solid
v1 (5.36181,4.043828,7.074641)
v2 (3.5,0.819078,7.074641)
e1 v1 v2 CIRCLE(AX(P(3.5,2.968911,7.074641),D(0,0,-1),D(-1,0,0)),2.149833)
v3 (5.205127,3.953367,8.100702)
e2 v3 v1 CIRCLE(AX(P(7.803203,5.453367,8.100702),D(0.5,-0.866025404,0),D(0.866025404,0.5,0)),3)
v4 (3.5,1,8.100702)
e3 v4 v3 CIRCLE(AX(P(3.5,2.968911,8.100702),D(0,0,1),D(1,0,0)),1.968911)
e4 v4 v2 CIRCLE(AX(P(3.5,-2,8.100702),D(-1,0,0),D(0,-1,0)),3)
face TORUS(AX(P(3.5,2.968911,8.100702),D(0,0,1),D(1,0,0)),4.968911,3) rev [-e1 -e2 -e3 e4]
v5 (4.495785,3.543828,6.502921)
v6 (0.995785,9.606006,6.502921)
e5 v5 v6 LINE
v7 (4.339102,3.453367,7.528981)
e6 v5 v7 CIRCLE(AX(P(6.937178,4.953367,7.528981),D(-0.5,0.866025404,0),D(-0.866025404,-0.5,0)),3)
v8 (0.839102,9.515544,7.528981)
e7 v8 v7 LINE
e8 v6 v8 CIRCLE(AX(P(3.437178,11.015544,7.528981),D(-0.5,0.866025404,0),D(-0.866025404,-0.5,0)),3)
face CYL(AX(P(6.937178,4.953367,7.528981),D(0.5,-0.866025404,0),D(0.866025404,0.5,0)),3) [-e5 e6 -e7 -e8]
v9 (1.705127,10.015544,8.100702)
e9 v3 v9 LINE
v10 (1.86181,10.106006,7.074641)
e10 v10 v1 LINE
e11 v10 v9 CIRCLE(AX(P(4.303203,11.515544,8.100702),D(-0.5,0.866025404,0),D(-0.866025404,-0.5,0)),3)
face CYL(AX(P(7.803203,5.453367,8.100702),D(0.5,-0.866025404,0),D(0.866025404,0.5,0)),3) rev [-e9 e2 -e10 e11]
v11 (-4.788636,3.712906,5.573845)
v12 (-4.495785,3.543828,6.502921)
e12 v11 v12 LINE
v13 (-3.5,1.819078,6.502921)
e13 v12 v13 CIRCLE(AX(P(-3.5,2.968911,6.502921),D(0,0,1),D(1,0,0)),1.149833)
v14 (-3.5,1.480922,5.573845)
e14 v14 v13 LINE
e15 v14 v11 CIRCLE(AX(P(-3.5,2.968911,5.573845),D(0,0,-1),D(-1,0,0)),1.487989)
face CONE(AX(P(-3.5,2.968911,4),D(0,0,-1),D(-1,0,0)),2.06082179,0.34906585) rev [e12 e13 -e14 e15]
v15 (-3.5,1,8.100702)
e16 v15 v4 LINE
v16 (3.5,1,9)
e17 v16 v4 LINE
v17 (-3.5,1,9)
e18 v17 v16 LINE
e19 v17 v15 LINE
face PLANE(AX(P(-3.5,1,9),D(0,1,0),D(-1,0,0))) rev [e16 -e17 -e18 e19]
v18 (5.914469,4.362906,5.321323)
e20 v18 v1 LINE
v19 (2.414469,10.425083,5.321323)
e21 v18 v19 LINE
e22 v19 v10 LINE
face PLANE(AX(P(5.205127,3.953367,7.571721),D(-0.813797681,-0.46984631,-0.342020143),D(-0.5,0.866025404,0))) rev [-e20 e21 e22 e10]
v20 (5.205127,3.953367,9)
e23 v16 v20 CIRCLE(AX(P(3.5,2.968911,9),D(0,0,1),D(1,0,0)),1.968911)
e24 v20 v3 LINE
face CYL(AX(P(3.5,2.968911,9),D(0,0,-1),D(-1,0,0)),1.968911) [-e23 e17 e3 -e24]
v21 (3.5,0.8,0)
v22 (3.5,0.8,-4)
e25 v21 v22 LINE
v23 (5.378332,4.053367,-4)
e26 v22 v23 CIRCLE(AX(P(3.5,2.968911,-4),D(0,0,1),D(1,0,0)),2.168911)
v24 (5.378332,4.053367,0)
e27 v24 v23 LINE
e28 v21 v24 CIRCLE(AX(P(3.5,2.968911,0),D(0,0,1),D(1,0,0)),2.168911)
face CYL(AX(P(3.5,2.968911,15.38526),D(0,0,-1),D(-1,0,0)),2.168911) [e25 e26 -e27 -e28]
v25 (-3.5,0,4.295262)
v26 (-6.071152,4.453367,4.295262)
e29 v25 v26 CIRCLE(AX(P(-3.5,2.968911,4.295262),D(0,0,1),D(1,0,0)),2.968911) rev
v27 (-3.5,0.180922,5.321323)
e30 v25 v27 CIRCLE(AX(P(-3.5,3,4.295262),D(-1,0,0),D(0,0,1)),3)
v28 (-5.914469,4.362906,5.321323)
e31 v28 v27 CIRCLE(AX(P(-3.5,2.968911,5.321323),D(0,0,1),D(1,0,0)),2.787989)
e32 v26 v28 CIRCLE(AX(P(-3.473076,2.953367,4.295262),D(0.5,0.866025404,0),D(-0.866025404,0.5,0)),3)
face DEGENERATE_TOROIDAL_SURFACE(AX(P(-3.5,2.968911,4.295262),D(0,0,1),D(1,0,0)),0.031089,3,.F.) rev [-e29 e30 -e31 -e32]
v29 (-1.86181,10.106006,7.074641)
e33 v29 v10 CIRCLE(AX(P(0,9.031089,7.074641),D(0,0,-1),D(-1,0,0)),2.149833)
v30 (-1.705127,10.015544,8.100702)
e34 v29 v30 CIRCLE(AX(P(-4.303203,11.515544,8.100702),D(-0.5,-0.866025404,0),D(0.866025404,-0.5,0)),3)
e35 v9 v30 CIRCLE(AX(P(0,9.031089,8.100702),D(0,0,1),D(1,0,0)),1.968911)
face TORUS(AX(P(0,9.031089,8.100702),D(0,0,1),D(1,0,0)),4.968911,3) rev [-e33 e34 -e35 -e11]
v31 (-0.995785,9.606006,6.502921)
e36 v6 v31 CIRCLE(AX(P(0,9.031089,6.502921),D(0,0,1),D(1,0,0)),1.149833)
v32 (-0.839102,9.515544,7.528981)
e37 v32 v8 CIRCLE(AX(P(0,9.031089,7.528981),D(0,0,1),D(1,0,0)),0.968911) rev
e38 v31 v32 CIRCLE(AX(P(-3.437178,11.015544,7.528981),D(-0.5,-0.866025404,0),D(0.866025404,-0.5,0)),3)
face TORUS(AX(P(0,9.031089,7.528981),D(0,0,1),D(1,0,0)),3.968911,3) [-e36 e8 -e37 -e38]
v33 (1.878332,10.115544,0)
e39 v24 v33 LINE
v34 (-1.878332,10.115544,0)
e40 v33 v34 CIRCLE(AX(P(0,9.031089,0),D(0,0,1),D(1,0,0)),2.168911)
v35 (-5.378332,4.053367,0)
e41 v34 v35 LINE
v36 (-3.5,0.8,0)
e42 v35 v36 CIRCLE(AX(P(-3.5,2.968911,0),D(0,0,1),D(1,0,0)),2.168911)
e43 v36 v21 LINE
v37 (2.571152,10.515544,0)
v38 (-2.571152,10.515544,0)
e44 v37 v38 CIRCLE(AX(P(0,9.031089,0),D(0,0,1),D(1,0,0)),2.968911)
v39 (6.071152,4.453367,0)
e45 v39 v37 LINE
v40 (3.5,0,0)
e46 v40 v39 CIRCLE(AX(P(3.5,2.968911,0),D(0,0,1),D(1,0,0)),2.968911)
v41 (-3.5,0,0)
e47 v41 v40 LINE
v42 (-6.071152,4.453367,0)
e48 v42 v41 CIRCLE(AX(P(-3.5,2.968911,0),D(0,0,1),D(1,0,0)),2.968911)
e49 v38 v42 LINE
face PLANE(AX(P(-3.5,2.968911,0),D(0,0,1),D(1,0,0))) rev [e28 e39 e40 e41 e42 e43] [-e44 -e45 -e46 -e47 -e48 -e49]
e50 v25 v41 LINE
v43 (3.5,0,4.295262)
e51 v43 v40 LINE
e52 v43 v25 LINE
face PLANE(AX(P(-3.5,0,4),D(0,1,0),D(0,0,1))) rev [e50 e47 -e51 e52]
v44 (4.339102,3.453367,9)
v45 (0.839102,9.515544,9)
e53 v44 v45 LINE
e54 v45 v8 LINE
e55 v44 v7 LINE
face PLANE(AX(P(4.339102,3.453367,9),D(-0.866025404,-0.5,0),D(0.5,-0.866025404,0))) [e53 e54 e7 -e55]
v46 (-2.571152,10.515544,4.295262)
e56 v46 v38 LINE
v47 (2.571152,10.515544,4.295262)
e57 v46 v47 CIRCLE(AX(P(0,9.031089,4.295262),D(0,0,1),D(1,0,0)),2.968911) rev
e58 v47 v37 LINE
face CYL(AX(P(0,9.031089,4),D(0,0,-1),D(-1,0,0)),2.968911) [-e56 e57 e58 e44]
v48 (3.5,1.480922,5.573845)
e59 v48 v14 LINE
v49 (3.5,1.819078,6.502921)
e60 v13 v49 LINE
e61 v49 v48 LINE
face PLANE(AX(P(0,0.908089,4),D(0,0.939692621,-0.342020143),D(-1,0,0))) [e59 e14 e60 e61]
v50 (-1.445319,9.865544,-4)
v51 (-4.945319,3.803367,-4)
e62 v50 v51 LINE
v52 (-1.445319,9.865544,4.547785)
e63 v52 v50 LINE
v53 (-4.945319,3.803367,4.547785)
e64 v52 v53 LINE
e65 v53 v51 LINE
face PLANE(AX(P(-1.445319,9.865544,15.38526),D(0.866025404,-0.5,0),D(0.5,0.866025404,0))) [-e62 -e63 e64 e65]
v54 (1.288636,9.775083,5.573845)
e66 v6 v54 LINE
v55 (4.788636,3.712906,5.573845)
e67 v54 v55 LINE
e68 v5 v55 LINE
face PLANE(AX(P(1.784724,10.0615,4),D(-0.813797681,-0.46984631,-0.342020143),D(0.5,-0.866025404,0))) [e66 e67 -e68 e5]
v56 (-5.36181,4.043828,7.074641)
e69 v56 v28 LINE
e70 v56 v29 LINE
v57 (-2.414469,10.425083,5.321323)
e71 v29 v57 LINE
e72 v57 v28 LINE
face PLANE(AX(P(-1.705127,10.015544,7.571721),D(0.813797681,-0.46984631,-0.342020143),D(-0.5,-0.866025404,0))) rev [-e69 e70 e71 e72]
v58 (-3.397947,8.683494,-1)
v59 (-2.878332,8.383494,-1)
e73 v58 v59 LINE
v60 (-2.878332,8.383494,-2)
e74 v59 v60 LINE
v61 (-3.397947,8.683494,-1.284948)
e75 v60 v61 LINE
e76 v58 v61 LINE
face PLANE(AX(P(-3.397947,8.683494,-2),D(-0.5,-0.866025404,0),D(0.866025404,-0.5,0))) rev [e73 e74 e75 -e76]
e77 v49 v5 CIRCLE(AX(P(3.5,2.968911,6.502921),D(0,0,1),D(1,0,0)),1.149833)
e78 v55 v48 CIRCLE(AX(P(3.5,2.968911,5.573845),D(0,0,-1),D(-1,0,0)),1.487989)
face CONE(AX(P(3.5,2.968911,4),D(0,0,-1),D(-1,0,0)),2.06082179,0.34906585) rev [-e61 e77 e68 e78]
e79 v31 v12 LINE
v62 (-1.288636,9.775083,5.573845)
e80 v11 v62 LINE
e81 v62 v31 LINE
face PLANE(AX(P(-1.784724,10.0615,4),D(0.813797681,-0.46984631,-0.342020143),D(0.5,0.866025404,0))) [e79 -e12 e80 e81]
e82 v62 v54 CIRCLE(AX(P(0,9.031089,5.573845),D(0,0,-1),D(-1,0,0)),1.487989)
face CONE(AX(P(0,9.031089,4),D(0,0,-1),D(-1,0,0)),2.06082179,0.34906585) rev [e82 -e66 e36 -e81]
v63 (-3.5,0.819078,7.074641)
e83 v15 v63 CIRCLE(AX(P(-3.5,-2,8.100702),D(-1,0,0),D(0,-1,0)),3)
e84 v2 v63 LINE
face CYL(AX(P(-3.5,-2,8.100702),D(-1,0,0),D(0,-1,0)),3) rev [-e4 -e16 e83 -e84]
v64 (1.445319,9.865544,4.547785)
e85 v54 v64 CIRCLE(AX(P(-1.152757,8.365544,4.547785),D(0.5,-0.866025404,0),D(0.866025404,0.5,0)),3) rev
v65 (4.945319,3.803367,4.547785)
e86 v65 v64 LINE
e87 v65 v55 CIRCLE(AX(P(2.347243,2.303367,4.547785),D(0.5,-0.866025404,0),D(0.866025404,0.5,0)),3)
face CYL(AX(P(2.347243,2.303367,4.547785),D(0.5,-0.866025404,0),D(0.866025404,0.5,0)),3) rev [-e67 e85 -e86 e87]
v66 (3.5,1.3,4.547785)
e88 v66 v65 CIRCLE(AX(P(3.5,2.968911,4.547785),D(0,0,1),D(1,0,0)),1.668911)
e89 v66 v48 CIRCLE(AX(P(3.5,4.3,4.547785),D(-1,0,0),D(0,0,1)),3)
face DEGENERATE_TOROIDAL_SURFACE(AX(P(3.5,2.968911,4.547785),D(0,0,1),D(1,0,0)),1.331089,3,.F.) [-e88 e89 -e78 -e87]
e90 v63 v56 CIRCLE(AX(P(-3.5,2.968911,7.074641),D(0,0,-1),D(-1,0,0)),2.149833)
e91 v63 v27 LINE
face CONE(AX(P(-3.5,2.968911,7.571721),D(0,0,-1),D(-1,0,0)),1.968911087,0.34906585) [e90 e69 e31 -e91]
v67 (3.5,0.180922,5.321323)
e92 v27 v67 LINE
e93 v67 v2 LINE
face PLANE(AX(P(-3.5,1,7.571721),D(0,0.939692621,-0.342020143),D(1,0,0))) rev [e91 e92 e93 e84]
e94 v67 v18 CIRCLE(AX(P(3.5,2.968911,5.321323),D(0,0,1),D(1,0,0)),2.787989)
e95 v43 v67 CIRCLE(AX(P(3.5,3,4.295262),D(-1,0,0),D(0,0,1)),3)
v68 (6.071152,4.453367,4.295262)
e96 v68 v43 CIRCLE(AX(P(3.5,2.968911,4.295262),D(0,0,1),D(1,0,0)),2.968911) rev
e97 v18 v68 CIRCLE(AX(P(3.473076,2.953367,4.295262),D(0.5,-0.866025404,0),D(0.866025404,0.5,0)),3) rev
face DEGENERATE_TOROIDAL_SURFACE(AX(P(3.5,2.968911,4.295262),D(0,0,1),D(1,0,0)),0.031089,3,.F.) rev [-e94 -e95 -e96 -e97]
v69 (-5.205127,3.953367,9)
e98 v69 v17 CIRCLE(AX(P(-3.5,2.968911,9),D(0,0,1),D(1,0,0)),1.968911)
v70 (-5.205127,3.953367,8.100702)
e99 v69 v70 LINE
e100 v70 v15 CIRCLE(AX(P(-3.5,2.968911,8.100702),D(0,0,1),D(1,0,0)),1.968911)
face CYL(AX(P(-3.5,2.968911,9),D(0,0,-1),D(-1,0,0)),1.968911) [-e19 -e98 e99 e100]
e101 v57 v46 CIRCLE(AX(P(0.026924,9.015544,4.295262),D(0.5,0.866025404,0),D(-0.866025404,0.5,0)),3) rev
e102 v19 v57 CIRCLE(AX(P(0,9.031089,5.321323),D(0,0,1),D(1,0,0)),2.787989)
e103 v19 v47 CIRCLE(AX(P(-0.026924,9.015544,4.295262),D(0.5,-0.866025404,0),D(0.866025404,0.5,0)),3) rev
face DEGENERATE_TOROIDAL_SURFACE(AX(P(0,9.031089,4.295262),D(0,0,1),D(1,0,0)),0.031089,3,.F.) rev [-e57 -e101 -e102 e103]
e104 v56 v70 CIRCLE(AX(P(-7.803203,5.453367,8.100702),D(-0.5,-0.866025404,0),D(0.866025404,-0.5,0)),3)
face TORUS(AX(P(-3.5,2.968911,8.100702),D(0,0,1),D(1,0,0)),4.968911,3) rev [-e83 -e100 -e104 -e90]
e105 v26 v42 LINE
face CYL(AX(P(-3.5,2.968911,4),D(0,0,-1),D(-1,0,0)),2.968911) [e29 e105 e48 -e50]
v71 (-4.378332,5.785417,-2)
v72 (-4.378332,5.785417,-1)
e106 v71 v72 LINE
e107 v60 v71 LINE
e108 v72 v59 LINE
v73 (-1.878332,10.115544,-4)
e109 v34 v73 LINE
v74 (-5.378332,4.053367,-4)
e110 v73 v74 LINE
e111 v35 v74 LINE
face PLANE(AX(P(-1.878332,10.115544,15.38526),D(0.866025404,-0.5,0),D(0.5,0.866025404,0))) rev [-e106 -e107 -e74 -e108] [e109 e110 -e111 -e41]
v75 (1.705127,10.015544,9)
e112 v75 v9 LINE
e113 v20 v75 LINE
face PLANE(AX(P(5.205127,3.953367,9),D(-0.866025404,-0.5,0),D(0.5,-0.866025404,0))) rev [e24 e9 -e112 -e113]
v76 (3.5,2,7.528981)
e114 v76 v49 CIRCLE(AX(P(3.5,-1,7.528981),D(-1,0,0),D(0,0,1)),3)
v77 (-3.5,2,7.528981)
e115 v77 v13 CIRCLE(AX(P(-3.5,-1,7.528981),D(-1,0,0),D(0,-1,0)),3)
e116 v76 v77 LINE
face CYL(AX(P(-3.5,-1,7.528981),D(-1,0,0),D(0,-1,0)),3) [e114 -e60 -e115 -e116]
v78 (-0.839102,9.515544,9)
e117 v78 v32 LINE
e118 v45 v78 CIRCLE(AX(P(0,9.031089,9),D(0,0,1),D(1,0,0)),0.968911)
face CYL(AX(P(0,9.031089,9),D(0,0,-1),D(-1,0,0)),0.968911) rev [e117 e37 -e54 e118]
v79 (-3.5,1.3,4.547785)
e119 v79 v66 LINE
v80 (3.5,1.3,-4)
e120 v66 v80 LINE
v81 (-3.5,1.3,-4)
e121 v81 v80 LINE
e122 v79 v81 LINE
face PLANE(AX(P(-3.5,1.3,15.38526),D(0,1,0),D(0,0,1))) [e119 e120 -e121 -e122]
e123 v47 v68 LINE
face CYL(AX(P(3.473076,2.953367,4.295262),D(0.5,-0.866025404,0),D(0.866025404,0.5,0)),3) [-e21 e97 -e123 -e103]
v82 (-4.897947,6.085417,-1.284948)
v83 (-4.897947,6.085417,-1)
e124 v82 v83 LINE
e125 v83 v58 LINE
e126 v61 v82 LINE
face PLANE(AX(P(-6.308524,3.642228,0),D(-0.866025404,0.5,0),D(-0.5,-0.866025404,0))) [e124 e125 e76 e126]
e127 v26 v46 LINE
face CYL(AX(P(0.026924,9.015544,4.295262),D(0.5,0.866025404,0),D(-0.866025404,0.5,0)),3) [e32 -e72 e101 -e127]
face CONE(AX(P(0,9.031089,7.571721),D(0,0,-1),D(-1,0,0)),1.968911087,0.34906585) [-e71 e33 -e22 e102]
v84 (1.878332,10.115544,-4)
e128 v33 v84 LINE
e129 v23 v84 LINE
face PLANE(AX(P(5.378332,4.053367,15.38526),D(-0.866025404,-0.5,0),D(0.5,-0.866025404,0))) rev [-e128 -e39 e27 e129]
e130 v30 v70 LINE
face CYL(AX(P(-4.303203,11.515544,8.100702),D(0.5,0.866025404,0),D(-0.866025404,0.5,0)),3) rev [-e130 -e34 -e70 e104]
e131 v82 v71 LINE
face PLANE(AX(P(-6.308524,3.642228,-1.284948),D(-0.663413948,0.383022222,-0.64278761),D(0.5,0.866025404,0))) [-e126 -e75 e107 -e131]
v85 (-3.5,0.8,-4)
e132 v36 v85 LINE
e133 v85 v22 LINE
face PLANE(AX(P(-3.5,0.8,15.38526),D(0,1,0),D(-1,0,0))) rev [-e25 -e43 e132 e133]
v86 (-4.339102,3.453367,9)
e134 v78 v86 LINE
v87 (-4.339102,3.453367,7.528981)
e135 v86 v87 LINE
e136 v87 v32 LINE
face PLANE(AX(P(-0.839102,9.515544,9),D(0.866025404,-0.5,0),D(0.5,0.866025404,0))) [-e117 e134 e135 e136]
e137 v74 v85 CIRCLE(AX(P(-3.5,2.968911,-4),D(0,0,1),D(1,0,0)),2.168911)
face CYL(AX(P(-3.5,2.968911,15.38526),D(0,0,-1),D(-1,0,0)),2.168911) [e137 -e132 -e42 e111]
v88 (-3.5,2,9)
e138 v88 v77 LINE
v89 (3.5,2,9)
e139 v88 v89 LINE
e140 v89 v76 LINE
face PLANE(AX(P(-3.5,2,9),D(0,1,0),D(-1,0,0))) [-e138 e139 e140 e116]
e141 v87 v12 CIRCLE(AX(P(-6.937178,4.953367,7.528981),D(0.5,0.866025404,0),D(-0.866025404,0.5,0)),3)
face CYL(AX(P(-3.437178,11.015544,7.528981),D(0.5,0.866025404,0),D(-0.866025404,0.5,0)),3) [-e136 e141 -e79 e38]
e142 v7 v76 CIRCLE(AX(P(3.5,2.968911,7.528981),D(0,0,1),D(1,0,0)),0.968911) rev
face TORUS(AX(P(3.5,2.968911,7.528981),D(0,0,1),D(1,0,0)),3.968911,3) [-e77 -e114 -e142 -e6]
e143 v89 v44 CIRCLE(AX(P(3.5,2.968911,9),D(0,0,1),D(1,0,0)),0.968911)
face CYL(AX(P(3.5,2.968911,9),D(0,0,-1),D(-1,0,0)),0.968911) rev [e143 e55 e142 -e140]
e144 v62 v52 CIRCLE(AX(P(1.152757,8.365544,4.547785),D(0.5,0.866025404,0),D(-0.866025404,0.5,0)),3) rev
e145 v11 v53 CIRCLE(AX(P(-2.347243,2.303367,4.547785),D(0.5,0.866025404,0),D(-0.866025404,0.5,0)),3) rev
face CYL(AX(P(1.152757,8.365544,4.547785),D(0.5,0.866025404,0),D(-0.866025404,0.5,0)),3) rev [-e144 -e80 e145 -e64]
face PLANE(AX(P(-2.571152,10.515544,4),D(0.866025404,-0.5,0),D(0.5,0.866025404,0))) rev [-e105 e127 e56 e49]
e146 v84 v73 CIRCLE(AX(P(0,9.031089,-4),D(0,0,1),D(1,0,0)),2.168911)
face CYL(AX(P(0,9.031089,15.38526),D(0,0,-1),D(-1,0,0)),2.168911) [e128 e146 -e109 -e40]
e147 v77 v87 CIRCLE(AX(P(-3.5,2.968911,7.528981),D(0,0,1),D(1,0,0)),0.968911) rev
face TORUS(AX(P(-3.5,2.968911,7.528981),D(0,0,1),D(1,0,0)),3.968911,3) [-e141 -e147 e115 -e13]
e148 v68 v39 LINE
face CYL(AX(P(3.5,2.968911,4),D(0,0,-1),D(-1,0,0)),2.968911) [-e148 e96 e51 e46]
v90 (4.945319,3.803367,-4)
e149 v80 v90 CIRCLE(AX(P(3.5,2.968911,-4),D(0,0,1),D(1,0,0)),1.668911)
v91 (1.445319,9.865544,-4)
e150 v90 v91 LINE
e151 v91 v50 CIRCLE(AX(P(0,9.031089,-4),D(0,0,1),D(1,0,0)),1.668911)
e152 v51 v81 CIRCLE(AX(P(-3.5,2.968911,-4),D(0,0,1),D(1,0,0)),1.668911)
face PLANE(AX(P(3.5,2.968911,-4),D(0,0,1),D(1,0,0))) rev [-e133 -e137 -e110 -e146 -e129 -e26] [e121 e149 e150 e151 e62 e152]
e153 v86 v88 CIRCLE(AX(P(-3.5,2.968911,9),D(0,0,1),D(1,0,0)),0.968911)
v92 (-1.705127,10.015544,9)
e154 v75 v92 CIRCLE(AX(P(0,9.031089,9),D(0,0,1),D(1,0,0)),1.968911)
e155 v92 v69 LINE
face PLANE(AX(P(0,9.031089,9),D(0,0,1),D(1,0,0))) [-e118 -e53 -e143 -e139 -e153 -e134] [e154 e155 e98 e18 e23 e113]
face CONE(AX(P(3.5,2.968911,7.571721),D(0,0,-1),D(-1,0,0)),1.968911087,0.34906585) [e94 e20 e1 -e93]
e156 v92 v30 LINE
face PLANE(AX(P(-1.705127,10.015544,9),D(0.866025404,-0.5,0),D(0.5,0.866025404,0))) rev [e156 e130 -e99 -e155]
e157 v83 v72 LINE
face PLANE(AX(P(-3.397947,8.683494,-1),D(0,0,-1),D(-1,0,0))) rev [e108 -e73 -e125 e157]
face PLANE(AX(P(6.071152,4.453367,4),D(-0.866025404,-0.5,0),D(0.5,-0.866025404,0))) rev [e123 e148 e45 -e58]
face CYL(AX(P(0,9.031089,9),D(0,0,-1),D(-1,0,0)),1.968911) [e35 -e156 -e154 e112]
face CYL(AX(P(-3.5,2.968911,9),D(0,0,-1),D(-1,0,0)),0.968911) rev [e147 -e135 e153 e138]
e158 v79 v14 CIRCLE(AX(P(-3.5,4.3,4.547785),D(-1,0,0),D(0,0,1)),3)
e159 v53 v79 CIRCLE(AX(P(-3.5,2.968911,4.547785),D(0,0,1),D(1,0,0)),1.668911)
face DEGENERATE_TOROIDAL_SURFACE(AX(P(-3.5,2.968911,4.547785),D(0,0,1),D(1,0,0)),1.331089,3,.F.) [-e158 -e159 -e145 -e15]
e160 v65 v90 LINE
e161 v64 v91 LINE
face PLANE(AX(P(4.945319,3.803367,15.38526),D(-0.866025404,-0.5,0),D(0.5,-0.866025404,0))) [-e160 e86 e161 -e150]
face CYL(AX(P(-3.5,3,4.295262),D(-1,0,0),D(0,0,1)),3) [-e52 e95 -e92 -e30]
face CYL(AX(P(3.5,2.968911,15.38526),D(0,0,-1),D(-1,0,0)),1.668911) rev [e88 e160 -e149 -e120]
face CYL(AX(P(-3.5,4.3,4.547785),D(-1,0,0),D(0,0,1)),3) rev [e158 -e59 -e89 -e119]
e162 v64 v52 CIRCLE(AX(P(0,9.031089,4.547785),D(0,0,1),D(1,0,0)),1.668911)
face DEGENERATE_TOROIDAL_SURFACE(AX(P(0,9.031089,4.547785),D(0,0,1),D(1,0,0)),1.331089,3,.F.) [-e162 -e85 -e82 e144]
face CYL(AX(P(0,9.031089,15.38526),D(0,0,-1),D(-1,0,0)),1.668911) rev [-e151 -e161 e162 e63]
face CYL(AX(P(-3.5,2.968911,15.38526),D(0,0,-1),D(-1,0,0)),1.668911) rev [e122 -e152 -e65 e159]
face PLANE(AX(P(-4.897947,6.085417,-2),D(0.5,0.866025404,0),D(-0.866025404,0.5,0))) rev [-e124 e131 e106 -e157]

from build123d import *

# Parameters (mm, degrees)
EXTRUDE_1_DEPTH  = 4
EXTRUDE_2_DEPTH  = 4
EXTRUDE_3_DEPTH  = 5
CHAMFER_1_SIZE   = 1.3
CHAMFER_1_SIZE_2 = 3.571720645
CHAMFER_2_SIZE   = 3
CHAMFER_2_SIZE_2 = 1.091910703
FILLET_1_R       = 3
SKETCH_5_W       = 1
SKETCH_5_H       = 3
EXTRUDE_4_DEPTH  = 0.6
CHAMFER_3_SIZE2  = 0.715052156
CHAMFER_3_SIZE   = 0.6


# Some blends are built 0.0001 mm under size
with BuildPart() as part:
    # Эскиз2 → Бобышка-Вытянуть1 (new body)
    with BuildSketch(Plane.XY.offset(-4)):
        with BuildLine():
            Line((5.3783321, 4.05336663), (1.8783321, 10.115544457))
            ThreePointArc((1.8783321, 10.115544457), (0, 11.2), (-1.8783321, 10.115544457))
            Line((-1.8783321, 10.115544457), (-5.3783321, 4.05336663))
            ThreePointArc((-5.3783321, 4.05336663), (-5.3783321, 1.884455543), (-3.5, 0.8))
            Line((-3.5, 0.8), (3.5, 0.8))
            ThreePointArc((3.5, 0.8), (5.3783321, 1.884455543), (5.3783321, 4.05336663))
        make_face()
        with BuildLine():
            Line((-1.445319398, 9.865544457), (-4.945319398, 3.80336663))
            ThreePointArc((-4.945319398, 3.80336663), (-4.945319398, 2.134455543), (-3.5, 1.3))
            Line((-3.5, 1.3), (3.5, 1.3))
            ThreePointArc((3.5, 1.3), (4.945319398, 2.134455543), (4.945319398, 3.80336663))
            Line((4.945319398, 3.80336663), (1.445319398, 9.865544457))
            ThreePointArc((1.445319398, 9.865544457), (0, 10.7), (-1.445319398, 9.865544457))
        make_face(mode=Mode.SUBTRACT)
    extrude(amount=EXTRUDE_1_DEPTH)

    # Эскиз3 → Бобышка-Вытянуть2 (add)
    with BuildSketch(Plane.XY):
        with BuildLine():
            Line((-3.5, 0), (3.5, 0))
            ThreePointArc((3.5, 0), (6.071152423, 1.484455543), (6.071152423, 4.45336663))
            Line((6.071152423, 4.45336663), (2.571152423, 10.515544457))
            ThreePointArc((2.571152423, 10.515544457), (0, 12), (-2.571152423, 10.515544457))
            Line((-2.571152423, 10.515544457), (-6.071152423, 4.45336663))
            ThreePointArc((-6.071152423, 4.45336663), (-6.071152423, 1.484455543), (-3.5, 0))
        make_face()
        with BuildLine():
            Line((4.945319398, 3.80336663), (1.445319398, 9.865544457))
            ThreePointArc((1.445319398, 9.865544457), (0, 10.7), (-1.445319398, 9.865544457))
            Line((-1.445319398, 9.865544457), (-4.945319398, 3.80336663))
            ThreePointArc((-4.945319398, 3.80336663), (-4.945319398, 2.134455543), (-3.5, 1.3))
            Line((-3.5, 1.3), (3.5, 1.3))
            ThreePointArc((3.5, 1.3), (4.945319398, 2.134455543), (4.945319398, 3.80336663))
        make_face(mode=Mode.SUBTRACT)
    extrude(amount=EXTRUDE_2_DEPTH)

    # Эскиз4 → Бобышка-Вытянуть3 (add)
    with BuildSketch(Plane.XY.offset(4)):
        with BuildLine():
            Line((-1.705127019, 10.015544457), (-5.205127019, 3.95336663))
            ThreePointArc((-5.205127019, 3.95336663), (-5.205127019, 1.984455543), (-3.5, 1))
            Line((-3.5, 1), (3.5, 1))
            ThreePointArc((3.5, 1), (5.205127019, 1.984455543), (5.205127019, 3.95336663))
            Line((5.205127019, 3.95336663), (1.705127019, 10.015544457))
            ThreePointArc((1.705127019, 10.015544457), (0, 11), (-1.705127019, 10.015544457))
        make_face()
        with BuildLine():
            Line((-3.5, 2), (3.5, 2))
            ThreePointArc((3.5, 2), (4.339101615, 2.484455543), (4.339101615, 3.45336663))
            Line((4.339101615, 3.45336663), (0.839101615, 9.515544457))
            ThreePointArc((0.839101615, 9.515544457), (0, 10), (-0.839101615, 9.515544457))
            Line((-0.839101615, 9.515544457), (-4.339101615, 3.45336663))
            ThreePointArc((-4.339101615, 3.45336663), (-4.339101615, 2.484455543), (-3.5, 2))
        make_face(mode=Mode.SUBTRACT)
    extrude(amount=EXTRUDE_3_DEPTH)

    # Фаска1
    # the kernel refuses this chamfer: 3.571720645, 1.3 mm, written as the material it adds along each edge
    with BuildSketch(Plane(origin=(-3.5, 1, 4), x_dir=(0, -0.9950833631817486, -0.09904090225205049), z_dir=(1, 0, 0))) as chamfer_1_piece_1_section:
        Polygon((CHAMFER_1_SIZE * 0.995083363182, -CHAMFER_1_SIZE * 0.0990409022521), (-CHAMFER_1_SIZE_2 * 0.0990409022601, -CHAMFER_1_SIZE_2 * 0.995083363263), (0, 0), align=None)
    chamfer_1_piece_1 = extrude(amount=7, mode=Mode.PRIVATE)
    chamfer_1_piece_1 = split(chamfer_1_piece_1, bisect_by=Plane(origin=(-7e-09, 0, 5.183770474), z_dir=(0, 1, 0)), keep=Keep.TOP, mode=Mode.PRIVATE)
    add(chamfer_1_piece_1)
    with BuildSketch(Plane(origin=(3.5, 2.968911087, 4), x_dir=(0, -1, 0), z_dir=(-1, 0, 0))) as chamfer_1_piece_2_section:
        Polygon((1.968911087 + CHAMFER_1_SIZE, 0), (1.968911087, CHAMFER_1_SIZE_2), (1.968911087, 0), align=None)
    chamfer_1_piece_2 = revolve(axis=Axis((3.5, 2.968911087, 4), (0, 0, 1)), revolution_arc=120, mode=Mode.PRIVATE)
    chamfer_1_piece_2 = chamfer_1_piece_2 & Plane(origin=(3.5, 2.968911087, 5.239170832), x_dir=(0, -1, 0), z_dir=(0, 0, -1)) * Cylinder(2.968911087, 15, mode=Mode.PRIVATE)
    add(chamfer_1_piece_2)
    with BuildSketch(Plane(origin=(-3.5, 2.968911087, 4), x_dir=(-0.8660254037844399, 0.4999999999999977, 0), z_dir=(0.4999999999999977, 0.8660254037844399, 0))) as chamfer_1_piece_3_section:
        Polygon((1.968911087 + CHAMFER_1_SIZE, 0), (1.968911087, CHAMFER_1_SIZE_2), (1.968911087, 0), align=None)
    chamfer_1_piece_3 = revolve(axis=Axis((-3.5, 2.968911087, 4), (0, 0, 1)), revolution_arc=120, mode=Mode.PRIVATE)
    chamfer_1_piece_3 = chamfer_1_piece_3 & Plane(origin=(-3.5, 2.968911087, 5.239170832), x_dir=(-0.8660254037844396, 0.4999999999999984, 0), z_dir=(0, 0, -1)) * Cylinder(2.968911087, 15, mode=Mode.PRIVATE)
    add(chamfer_1_piece_3)
    with BuildSketch(Plane(origin=(5.205127019, 3.95336663, 4), x_dir=(0.8617674713986507, 0.497541681590875, -0.09904090225205049), z_dir=(-0.5000000000000007, 0.8660254037844384, 0))) as chamfer_1_piece_4_section:
        Polygon((CHAMFER_1_SIZE * 0.995083363182, -CHAMFER_1_SIZE * 0.0990409022521), (-CHAMFER_1_SIZE_2 * 0.0990409022601, -CHAMFER_1_SIZE_2 * 0.995083363263), (0, 0), align=None)
    chamfer_1_piece_4 = extrude(amount=7, mode=Mode.PRIVATE)
    chamfer_1_piece_4 = split(chamfer_1_piece_4, bisect_by=Plane(origin=(4.321152424, 7.484455541, 5.183770458), z_dir=(-0.8660254037844383, -0.5000000000000007, 0)), keep=Keep.TOP, mode=Mode.PRIVATE)
    add(chamfer_1_piece_4)
    with BuildSketch(Plane(origin=(-1.705127019, 10.015544457, 4), x_dir=(-0.8617674713986511, 0.49754168159087425, -0.09904090225205052), z_dir=(-0.49999999999999994, -0.8660254037844387, 0))) as chamfer_1_piece_5_section:
        Polygon((CHAMFER_1_SIZE * 0.995083363182, -CHAMFER_1_SIZE * 0.0990409022521), (-CHAMFER_1_SIZE_2 * 0.0990409022601, -CHAMFER_1_SIZE_2 * 0.995083363263), (0, 0), align=None)
    chamfer_1_piece_5 = extrude(amount=7, mode=Mode.PRIVATE)
    chamfer_1_piece_5 = split(chamfer_1_piece_5, bisect_by=Plane(origin=(-4.321152422, 7.484455545, 5.183770458), z_dir=(0.8660254037844385, -0.5000000000000003, 0)), keep=Keep.TOP, mode=Mode.PRIVATE)
    add(chamfer_1_piece_5)
    with BuildSketch(Plane(origin=(0, 9.031088913, 4), x_dir=(0.866025403784439, 0.49999999999999944, 0), z_dir=(0.49999999999999944, -0.866025403784439, 0))) as chamfer_1_piece_6_section:
        Polygon((1.968911087 + CHAMFER_1_SIZE, 0), (1.968911087, CHAMFER_1_SIZE_2), (1.968911087, 0), align=None)
    chamfer_1_piece_6 = revolve(axis=Axis((0, 9.031088913, 4), (0, 0, 1)), revolution_arc=120, mode=Mode.PRIVATE)
    chamfer_1_piece_6 = chamfer_1_piece_6 & Plane(origin=(0, 9.031088913, 5.239170832), x_dir=(0.866025403784439, 0.49999999999999933, 0), z_dir=(0, 0, -1)) * Cylinder(2.968911087, 15, mode=Mode.PRIVATE)
    add(chamfer_1_piece_6)

    # Фаска2
    # the kernel refuses this chamfer: 3, 1.091910703 mm, written as the material it takes off along each edge
    with BuildSketch(Plane(origin=(-3.5, 2, 4), x_dir=(0, 0.013184058198645864, 0.9999130865277315), z_dir=(1, 0, 0))) as chamfer_2_piece_1_section:
        Polygon((CHAMFER_2_SIZE * 0.999913086528, CHAMFER_2_SIZE * 0.0131840581986), (-CHAMFER_2_SIZE_2 * 0.0131840581962, CHAMFER_2_SIZE_2 * 0.999913086343), (0, 0), align=None)
    chamfer_2_piece_1 = extrude(amount=7, mode=Mode.PRIVATE)
    chamfer_2_piece_1 = split(chamfer_2_piece_1, bisect_by=Plane(origin=(-2.923308358, 1.3, 5.225786657), z_dir=(0, 1, 0)), keep=Keep.TOP, mode=Mode.PRIVATE)
    add(chamfer_2_piece_1, mode=Mode.SUBTRACT)
    with BuildSketch(Plane(origin=(3.5, 2.968911087, 4), x_dir=(0, -1, 0), z_dir=(-1, 0, 0))) as chamfer_2_piece_2_section:
        Polygon((0.968911087 + CHAMFER_2_SIZE_2, 0), (0.968911087, CHAMFER_2_SIZE), (0.968911087, 0), align=None)
    chamfer_2_piece_2 = revolve(axis=Axis((3.5, 2.968911087, 4), (0, 0, 1)), revolution_arc=120, mode=Mode.PRIVATE)
    chamfer_2_piece_2 = chamfer_2_piece_2 & Plane(origin=(3.5, 2.968911087, 5.086168239), x_dir=(0, -1, 0), z_dir=(0, 0, -1)) * Cylinder(1.668911087, 12, mode=Mode.PRIVATE)
    add(chamfer_2_piece_2, mode=Mode.SUBTRACT)
    with BuildSketch(Plane(origin=(-3.5, 2.968911087, 4), x_dir=(-0.8660254037844419, 0.4999999999999944, 0), z_dir=(0.4999999999999944, 0.8660254037844419, 0))) as chamfer_2_piece_3_section:
        Polygon((0.968911087 + CHAMFER_2_SIZE_2, 0), (0.968911087, CHAMFER_2_SIZE), (0.968911087, 0), align=None)
    chamfer_2_piece_3 = revolve(axis=Axis((-3.5, 2.968911087, 4), (0, 0, 1)), revolution_arc=120, mode=Mode.PRIVATE)
    chamfer_2_piece_3 = chamfer_2_piece_3 & Plane(origin=(-3.5, 2.968911087, 5.086168239), x_dir=(-0.8660254037844405, 0.49999999999999695, 0), z_dir=(0, 0, -1)) * Cylinder(1.668911087, 12, mode=Mode.PRIVATE)
    add(chamfer_2_piece_3, mode=Mode.SUBTRACT)
    with BuildSketch(Plane(origin=(4.339101615, 3.45336663, 4), x_dir=(0.8617674713986508, 0.4975416815908748, -0.09904090225204927), z_dir=(-0.5000000000000004, 0.8660254037844384, 0))) as chamfer_2_piece_4_section:
        Polygon((CHAMFER_2_SIZE_2 * 0.995083362998, -CHAMFER_2_SIZE_2 * 0.0990409022338), (-CHAMFER_2_SIZE * 0.099040902252, -CHAMFER_2_SIZE * 0.995083363182), (0, 0), align=None)
    chamfer_2_piece_4 = extrude(amount=7, mode=Mode.PRIVATE)
    chamfer_2_piece_4 = split(chamfer_2_piece_4, bisect_by=Plane(origin=(3.195319408, 6.834455526, 5.1059003), z_dir=(-0.8660254037844385, -0.5000000000000004, 0)), keep=Keep.TOP, mode=Mode.PRIVATE)
    add(chamfer_2_piece_4, mode=Mode.SUBTRACT)
    with BuildSketch(Plane(origin=(-0.839101615, 9.515544457, 4), x_dir=(-0.8617674713986513, 0.4975416815908743, -0.09904090225204927), z_dir=(-0.49999999999999994, -0.8660254037844387, 0))) as chamfer_2_piece_5_section:
        Polygon((CHAMFER_2_SIZE_2 * 0.995083362998, -CHAMFER_2_SIZE_2 * 0.0990409022338), (-CHAMFER_2_SIZE * 0.099040902252, -CHAMFER_2_SIZE * 0.995083363182), (0, 0), align=None)
    chamfer_2_piece_5 = extrude(amount=7, mode=Mode.PRIVATE)
    chamfer_2_piece_5 = split(chamfer_2_piece_5, bisect_by=Plane(origin=(-3.195319387, 6.834455562, 5.1059003), z_dir=(0.8660254037844387, -0.4999999999999999, 0)), keep=Keep.TOP, mode=Mode.PRIVATE)
    add(chamfer_2_piece_5, mode=Mode.SUBTRACT)
    with BuildSketch(Plane(origin=(0, 9.031088913, 4), x_dir=(0.8660254037844403, 0.4999999999999973, 0), z_dir=(0.4999999999999973, -0.8660254037844403, 0))) as chamfer_2_piece_6_section:
        Polygon((0.968911087 + CHAMFER_2_SIZE_2, 0), (0.968911087, CHAMFER_2_SIZE), (0.968911087, 0), align=None)
    chamfer_2_piece_6 = revolve(axis=Axis((0, 9.031088913, 4), (0, 0, 1)), revolution_arc=120, mode=Mode.PRIVATE)
    chamfer_2_piece_6 = chamfer_2_piece_6 & Plane(origin=(0, 9.031088913, 5.086168239), x_dir=(0.8660254037844393, 0.49999999999999906, 0), z_dir=(0, 0, -1)) * Cylinder(1.668911087, 12, mode=Mode.PRIVATE)
    add(chamfer_2_piece_6, mode=Mode.SUBTRACT)

    # Скругление1
    fillet_1_edges = [part.edges().sort_by_distance(p)[0] for p in [
        (0, 1, 7.571720645),
        (5.205127019, 1.984455543, 7.571720645),
        (-5.205127019, 1.984455543, 7.571720645),
        (3.455127019, 6.984455543, 7.571720645),
        (-3.455127019, 6.984455543, 7.571720645),
        (0, 11, 7.571720645),
        (0, 0, 4.824243226),
        (6.071152423, 1.484455543, 4.824243226),
        (-6.071152423, 1.484455543, 4.824243226),
        (4.321152423, 7.484455543, 4.824243226),
        (-4.321152423, 7.484455543, 4.824243226),
        (0, 12, 4.824243226),
        (0, 2, 7),
        (4.339101615, 2.484455543, 7),
        (-4.339101615, 2.484455543, 7),
        (2.589101615, 6.484455543, 7),
        (-2.589101615, 6.484455543, 7),
        (0, 10, 7),
        (0, 1.3, 5.076765806),
        (4.945319398, 2.134455543, 5.076765807),
        (-4.945319398, 2.134455543, 5.076765807),
        (3.195319398, 6.834455543, 5.076765806),
        (-3.195319398, 6.834455543, 5.076765806),
        (0, 10.7, 5.076765807),
    ]]
    fillet(fillet_1_edges, radius=FILLET_1_R)

    # Эскиз5 → Бобышка-Вытянуть4 (add)
    with BuildSketch(Plane(origin=(-5.788908311, 3.342227772, 0), x_dir=(0, 0, 1), z_dir=(-0.8660254037844387, 0.49999999999999983, 0))):
        with Locations((-1.5, 4.321152423)):
            Rectangle(SKETCH_5_W, SKETCH_5_H)
    extrude(amount=EXTRUDE_4_DEPTH)

    # Фаска3
    chamfer_3_edges = [part.edges().sort_by_distance(p)[0] for p in [
        (-4.147947342, 7.384455543, -2),
    ]]
    chamfer_3_side = [part.faces().sort_by_distance(p)[0] for p in [
        (-4.137555037, 7.378455543, -2),
    ]]
    chamfer(chamfer_3_edges, length=CHAMFER_3_SIZE - 0.0001, length2=CHAMFER_3_SIZE2 - 0.0001, reference=chamfer_3_side[0])  # a hair under: the kernel refuses the full size


solid = part.part
